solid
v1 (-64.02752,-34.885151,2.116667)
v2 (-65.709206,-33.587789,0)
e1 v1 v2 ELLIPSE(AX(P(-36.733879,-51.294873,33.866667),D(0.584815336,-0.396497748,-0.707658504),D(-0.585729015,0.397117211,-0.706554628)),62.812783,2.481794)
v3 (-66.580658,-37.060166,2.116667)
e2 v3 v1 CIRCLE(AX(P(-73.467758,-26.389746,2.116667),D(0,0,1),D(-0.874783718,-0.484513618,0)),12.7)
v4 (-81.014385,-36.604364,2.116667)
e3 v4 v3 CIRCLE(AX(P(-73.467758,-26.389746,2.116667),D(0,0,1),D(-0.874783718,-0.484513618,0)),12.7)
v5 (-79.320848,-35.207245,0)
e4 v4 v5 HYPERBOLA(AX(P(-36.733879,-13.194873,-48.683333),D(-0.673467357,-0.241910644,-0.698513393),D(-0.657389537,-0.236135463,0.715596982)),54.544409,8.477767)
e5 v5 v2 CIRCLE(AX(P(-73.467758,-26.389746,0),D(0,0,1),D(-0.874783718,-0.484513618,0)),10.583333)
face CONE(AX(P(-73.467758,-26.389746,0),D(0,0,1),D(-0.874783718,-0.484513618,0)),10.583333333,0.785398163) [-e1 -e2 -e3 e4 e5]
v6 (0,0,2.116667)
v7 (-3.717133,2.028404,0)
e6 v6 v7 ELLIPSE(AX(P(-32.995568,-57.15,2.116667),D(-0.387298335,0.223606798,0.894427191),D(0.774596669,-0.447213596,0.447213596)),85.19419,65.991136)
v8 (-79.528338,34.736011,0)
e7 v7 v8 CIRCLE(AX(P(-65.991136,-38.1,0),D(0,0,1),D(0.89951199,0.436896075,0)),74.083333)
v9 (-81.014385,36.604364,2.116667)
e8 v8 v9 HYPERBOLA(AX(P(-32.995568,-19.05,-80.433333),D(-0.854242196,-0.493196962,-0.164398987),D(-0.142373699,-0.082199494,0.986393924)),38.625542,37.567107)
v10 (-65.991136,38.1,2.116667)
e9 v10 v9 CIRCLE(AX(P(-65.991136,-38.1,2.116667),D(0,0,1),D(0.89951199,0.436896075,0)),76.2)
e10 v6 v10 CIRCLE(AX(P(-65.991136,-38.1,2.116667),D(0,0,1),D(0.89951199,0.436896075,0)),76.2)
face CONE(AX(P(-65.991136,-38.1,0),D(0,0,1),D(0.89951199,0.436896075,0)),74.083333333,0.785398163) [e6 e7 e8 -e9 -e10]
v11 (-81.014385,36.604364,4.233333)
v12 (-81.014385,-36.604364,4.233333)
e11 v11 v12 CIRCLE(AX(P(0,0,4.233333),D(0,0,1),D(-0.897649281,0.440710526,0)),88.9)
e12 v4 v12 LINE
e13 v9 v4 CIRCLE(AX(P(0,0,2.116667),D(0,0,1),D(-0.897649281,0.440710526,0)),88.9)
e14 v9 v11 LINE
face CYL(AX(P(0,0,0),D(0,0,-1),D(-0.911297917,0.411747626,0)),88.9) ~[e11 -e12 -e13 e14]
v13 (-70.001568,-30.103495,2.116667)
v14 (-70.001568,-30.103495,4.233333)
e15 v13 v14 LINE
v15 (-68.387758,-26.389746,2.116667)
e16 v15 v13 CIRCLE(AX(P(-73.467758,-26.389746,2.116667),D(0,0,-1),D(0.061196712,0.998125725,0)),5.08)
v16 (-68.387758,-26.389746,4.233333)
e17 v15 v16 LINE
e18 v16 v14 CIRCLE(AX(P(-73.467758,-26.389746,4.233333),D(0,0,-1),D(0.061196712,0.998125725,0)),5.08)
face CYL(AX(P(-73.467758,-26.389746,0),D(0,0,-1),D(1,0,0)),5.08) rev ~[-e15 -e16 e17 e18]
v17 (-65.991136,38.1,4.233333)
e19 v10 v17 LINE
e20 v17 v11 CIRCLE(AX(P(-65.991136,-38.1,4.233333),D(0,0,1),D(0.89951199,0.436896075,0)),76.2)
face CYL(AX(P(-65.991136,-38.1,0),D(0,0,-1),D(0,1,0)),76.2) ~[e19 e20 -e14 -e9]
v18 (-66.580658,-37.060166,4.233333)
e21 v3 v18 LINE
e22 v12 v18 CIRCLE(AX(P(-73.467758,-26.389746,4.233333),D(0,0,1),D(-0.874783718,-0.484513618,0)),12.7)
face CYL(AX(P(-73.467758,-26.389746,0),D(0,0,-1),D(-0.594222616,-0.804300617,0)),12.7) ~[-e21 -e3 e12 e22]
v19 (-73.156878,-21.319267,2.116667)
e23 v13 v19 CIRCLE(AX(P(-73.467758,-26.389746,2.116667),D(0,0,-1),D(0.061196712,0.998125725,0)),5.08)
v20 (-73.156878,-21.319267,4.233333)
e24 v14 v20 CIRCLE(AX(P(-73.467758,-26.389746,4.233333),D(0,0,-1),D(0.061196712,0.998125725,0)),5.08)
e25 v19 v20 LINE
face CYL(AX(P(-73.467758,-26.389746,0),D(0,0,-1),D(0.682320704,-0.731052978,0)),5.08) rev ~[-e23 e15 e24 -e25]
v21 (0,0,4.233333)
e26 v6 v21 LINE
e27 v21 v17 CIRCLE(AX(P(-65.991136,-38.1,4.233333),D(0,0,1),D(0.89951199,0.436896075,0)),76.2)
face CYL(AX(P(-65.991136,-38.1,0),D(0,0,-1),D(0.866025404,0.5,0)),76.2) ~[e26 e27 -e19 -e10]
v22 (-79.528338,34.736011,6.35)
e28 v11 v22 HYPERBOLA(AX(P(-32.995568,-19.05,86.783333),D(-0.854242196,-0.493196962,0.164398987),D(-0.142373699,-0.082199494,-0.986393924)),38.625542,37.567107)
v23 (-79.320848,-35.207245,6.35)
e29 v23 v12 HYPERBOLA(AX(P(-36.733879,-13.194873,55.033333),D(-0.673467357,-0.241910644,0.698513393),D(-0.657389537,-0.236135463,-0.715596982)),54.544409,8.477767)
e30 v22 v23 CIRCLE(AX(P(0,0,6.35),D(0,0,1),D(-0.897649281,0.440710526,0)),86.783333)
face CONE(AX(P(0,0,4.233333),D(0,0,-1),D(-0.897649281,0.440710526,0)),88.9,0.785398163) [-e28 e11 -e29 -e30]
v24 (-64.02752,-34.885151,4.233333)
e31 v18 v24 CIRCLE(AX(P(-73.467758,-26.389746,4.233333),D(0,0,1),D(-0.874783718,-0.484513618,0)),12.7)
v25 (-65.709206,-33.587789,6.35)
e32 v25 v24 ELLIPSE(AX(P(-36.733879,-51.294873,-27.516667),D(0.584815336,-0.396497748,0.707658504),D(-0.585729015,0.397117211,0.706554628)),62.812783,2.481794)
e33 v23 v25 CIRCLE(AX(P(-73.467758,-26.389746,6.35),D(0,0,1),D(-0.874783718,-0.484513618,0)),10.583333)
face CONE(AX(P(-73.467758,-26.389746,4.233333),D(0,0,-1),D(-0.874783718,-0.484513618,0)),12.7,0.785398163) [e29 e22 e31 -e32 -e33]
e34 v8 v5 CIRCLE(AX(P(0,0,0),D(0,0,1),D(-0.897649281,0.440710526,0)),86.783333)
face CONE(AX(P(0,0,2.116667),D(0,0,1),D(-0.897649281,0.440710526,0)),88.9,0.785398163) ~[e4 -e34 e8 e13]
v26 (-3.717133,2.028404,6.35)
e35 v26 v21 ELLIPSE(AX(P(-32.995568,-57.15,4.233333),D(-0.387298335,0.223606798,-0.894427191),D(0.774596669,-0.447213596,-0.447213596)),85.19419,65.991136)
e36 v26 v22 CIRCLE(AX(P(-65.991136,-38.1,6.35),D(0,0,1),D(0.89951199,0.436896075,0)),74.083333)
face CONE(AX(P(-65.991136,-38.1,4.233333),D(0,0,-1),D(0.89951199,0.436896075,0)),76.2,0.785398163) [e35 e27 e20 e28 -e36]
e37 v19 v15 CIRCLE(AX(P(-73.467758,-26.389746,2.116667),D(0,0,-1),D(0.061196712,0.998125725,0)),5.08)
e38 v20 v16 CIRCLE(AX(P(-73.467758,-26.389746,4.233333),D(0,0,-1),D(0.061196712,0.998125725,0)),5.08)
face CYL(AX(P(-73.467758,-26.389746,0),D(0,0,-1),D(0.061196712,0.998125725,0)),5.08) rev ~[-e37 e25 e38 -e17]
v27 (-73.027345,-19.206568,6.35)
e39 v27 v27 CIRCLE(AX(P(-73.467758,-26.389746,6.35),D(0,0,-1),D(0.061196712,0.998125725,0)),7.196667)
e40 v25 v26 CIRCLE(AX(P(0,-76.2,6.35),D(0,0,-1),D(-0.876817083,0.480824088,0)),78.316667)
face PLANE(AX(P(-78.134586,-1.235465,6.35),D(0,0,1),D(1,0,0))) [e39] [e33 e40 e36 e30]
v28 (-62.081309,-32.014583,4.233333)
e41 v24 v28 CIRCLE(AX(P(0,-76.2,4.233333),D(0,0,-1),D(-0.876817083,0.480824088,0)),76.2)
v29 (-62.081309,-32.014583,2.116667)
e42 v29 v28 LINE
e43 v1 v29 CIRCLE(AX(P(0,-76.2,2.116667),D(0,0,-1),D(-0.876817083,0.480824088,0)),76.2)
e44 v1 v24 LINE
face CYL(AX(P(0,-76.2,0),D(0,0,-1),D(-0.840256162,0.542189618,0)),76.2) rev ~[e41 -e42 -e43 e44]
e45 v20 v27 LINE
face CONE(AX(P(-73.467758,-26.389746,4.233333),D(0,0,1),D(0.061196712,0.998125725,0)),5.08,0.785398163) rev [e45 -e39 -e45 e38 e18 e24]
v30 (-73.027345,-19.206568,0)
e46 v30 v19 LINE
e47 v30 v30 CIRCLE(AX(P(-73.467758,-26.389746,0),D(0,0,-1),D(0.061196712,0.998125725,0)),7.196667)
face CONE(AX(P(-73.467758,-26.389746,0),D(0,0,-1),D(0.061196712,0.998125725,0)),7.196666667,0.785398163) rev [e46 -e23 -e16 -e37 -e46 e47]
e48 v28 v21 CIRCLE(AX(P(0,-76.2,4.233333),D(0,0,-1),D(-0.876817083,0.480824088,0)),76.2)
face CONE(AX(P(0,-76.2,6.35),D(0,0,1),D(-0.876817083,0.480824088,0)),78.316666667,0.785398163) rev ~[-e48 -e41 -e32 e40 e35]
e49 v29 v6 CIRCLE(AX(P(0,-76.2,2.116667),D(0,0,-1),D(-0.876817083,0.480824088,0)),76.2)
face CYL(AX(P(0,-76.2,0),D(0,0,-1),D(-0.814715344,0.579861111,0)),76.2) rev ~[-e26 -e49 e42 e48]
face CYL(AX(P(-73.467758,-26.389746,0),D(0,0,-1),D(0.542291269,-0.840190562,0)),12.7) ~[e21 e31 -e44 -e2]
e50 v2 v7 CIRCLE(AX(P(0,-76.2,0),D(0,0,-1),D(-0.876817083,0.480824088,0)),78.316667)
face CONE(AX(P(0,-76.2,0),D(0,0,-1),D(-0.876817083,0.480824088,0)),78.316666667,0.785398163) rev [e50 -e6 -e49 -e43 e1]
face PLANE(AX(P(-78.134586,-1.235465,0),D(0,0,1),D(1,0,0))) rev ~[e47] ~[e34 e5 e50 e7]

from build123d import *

# Parameters (mm, degrees)
F2_DEPTH     = 6.35
F3_T6_ANGLE  = 79.5586583167
F3_T8_ANGLE  = 79.5586583167
F3_T10_ANGLE = 63.5249338853
F3_T12_ANGLE = 63.5249338853
F3_T14_ANGLE = 109.1774772549
F3_T16_ANGLE = 109.1774772549
F3_T18_ANGLE = 50.5483837844
F3_T20_ANGLE = 50.5483837844


# Not quite as in the source:
# - a fillet or chamfer that OpenCascade refuses, or shapes differently, is made with other operations: its cross-section is extruded or revolved along the edge and cut away or added


with BuildPart() as f2:
    # F1 (on Top) → F2 (new body)
    with BuildSketch(Plane.XY):
        with BuildLine():
            ThreePointArc((-73.1568782646, -21.3192674026), (-75.6518657205, 9.1233334372), (-65.9911357684, 38.1))
            ThreePointArc((-65.9911357684, 38.1), (-73.5398929218, 37.7251690762), (-81.0143847835, 36.6043639223))
            ThreePointArc((-81.0143847835, 36.6043639223), (-88.9, 0), (-81.0143847835, -36.6043639223))
            ThreePointArc((-81.0143847835, -36.6043639223), (-73.8686107341, -39.0834183952), (-66.5806584514, -37.0601662189))
            ThreePointArc((-66.5806584514, -37.0601662189), (-68.3796387065, -33.6253626057), (-70.0015683829, -30.1034952113))
            ThreePointArc((-70.0015683829, -30.1034952113), (-78.2486807064, -28.1070619795), (-73.1568782646, -21.3192674026))
        make_face()
        with BuildLine():
            ThreePointArc((0, 0), (-27.8911357684, 27.8911357684), (-65.9911357684, 38.1))
            ThreePointArc((-65.9911357684, 38.1), (-75.6518657205, 9.1233334372), (-73.1568782646, -21.3192674026))
            ThreePointArc((-73.1568782646, -21.3192674026), (-69.7673746876, -22.9092911449), (-68.3877575616, -26.3897460844))
            ThreePointArc((-68.3877575616, -26.3897460844), (-68.8086460032, -28.4143644401), (-70.0015683829, -30.1034952113))
            ThreePointArc((-70.0015683829, -30.1034952113), (-68.3796387065, -33.6253626057), (-66.5806584514, -37.0601662189))
            ThreePointArc((-66.5806584514, -37.0601662189), (-65.2319724125, -36.0573126333), (-64.0275195551, -34.8851511001))
            ThreePointArc((-64.0275195551, -34.8851511001), (-63.0707476834, -33.4387934378), (-62.0813092162, -32.0145833333))
            ThreePointArc((-62.0813092162, -32.0145833333), (-34.925, -8.4749354005), (0, 0))
        make_face()
    extrude(amount=F2_DEPTH)

    # F3: chamfer of 2.1166666667 on 10 edges, made by hand

    # F3_s1 → F3_t2 (revolve, cut)
    with BuildSketch(Plane(origin=(-71.580679249, 4.3887278976, 0), x_dir=(0, 0, 1), z_dir=(-0.9981257248, 0.061196712, 0))):
        Polygon((4.2333333333, -25.7562696385), (6.35, -23.6396029718), (6.35, -25.7562696385), align=None)
    revolve(axis=Axis((-73.4677575616, -26.3897460844, 6.35), (0, 0, -1)), mode=Mode.SUBTRACT)

    # F3_s3 → F3_t4 (revolve, cut)
    with BuildSketch(Plane(origin=(-71.580679249, 4.3887278976, 0), x_dir=(0, 0, 1), z_dir=(-0.9981257248, 0.061196712, 0))):
        Polygon((0, -23.6396029718), (2.1166666667, -25.7562696385), (0, -25.7562696385), align=None)
    revolve(axis=Axis((-73.4677575616, -26.3897460844, 0), (0, 0, -1)), mode=Mode.SUBTRACT)

    # F3_s5 → F3_t6 (revolve, cut)
    with BuildSketch(Plane(origin=(2.3767752158, -4.8934699303, 0), x_dir=(0, 0, 1), z_dir=(0.4368960746, -0.8995119899, 0))):
        Polygon((4.2333333333, -0.1944417058), (6.35, 1.9222249609), (6.35, -0.1944417058), align=None)
    revolve(axis=Axis((-65.9911357684, -38.1, 6.35), (0, 0, 1)), revolution_arc=F3_T6_ANGLE, mode=Mode.SUBTRACT)

    # F3_s7 → F3_t8 (revolve, cut)
    with BuildSketch(Plane(origin=(2.3767752158, -4.8934699303, 0), x_dir=(0, 0, 1), z_dir=(0.4368960746, -0.8995119899, 0))):
        Polygon((0, 1.9222249609), (2.1166666667, -0.1944417058), (0, -0.1944417058), align=None)
    revolve(axis=Axis((-65.9911357684, -38.1, 0), (0, 0, 1)), revolution_arc=F3_T8_ANGLE, mode=Mode.SUBTRACT)

    # F3_s9 → F3_t10 (revolve, cut)
    with BuildSketch(Plane(origin=(-32.1255217702, -58.583184591, 0), x_dir=(0, 0, 1), z_dir=(-0.4808240877, -0.8768170828, 0))):
        Polygon((6.35, 41.6778711875), (4.2333333333, 39.5612045208), (6.35, 39.5612045208), align=None)
    revolve(axis=Axis((0, -76.2, 6.35), (0, 0, -1)), revolution_arc=F3_T10_ANGLE, mode=Mode.SUBTRACT)

    # F3_s11 → F3_t12 (revolve, cut)
    with BuildSketch(Plane(origin=(-32.1255217702, -58.583184591, 0), x_dir=(0, 0, 1), z_dir=(-0.4808240877, -0.8768170828, 0))):
        Polygon((0, 41.6778711875), (2.1166666667, 39.5612045208), (0, 39.5612045208), align=None)
    revolve(axis=Axis((0, -76.2, 0), (0, 0, -1)), revolution_arc=F3_T12_ANGLE, mode=Mode.SUBTRACT)

    # F3_s13 → F3_t14 (revolve, cut)
    with BuildSketch(Plane(origin=(-6.0616572407, 10.9442518524, 0), x_dir=(0, 0, 1), z_dir=(-0.484513618, 0.8747837184, 0))):
        Polygon((4.2333333333, -89.7545894961), (6.35, -87.6379228294), (6.35, -89.7545894961), align=None)
    revolve(axis=Axis((-73.4677575616, -26.3897460844, 6.35), (0, 0, 1)), revolution_arc=F3_T14_ANGLE, mode=Mode.SUBTRACT)

    # F3_s15 → F3_t16 (revolve, cut)
    with BuildSketch(Plane(origin=(-6.0616572407, 10.9442518524, 0), x_dir=(0, 0, 1), z_dir=(-0.484513618, 0.8747837184, 0))):
        Polygon((0, -87.6379228294), (2.1166666667, -89.7545894961), (0, -89.7545894961), align=None)
    revolve(axis=Axis((-73.4677575616, -26.3897460844, 0), (0, 0, 1)), revolution_arc=F3_T16_ANGLE, mode=Mode.SUBTRACT)

    # F3_s17 → F3_t18 (revolve, cut)
    with BuildSketch(Plane(origin=(0, 0, 0), x_dir=(0, 0, 1), z_dir=(0.4407105264, 0.8976492811, 0))):
        Polygon((4.2333333333, -88.9), (6.35, -86.7833333333), (6.35, -88.9), align=None)
    revolve(axis=Axis((0, 0, 6.35), (0, 0, 1)), revolution_arc=F3_T18_ANGLE, mode=Mode.SUBTRACT)

    # F3_s19 → F3_t20 (revolve, cut)
    with BuildSketch(Plane(origin=(0, 0, 0), x_dir=(0, 0, 1), z_dir=(0.4407105264, 0.8976492811, 0))):
        Polygon((2.1166666667, -88.9), (0, -86.7833333333), (0, -88.9), align=None)
    revolve(axis=Axis((0, 0, 0), (0, 0, 1)), revolution_arc=F3_T20_ANGLE, mode=Mode.SUBTRACT)


solid = f2.part
